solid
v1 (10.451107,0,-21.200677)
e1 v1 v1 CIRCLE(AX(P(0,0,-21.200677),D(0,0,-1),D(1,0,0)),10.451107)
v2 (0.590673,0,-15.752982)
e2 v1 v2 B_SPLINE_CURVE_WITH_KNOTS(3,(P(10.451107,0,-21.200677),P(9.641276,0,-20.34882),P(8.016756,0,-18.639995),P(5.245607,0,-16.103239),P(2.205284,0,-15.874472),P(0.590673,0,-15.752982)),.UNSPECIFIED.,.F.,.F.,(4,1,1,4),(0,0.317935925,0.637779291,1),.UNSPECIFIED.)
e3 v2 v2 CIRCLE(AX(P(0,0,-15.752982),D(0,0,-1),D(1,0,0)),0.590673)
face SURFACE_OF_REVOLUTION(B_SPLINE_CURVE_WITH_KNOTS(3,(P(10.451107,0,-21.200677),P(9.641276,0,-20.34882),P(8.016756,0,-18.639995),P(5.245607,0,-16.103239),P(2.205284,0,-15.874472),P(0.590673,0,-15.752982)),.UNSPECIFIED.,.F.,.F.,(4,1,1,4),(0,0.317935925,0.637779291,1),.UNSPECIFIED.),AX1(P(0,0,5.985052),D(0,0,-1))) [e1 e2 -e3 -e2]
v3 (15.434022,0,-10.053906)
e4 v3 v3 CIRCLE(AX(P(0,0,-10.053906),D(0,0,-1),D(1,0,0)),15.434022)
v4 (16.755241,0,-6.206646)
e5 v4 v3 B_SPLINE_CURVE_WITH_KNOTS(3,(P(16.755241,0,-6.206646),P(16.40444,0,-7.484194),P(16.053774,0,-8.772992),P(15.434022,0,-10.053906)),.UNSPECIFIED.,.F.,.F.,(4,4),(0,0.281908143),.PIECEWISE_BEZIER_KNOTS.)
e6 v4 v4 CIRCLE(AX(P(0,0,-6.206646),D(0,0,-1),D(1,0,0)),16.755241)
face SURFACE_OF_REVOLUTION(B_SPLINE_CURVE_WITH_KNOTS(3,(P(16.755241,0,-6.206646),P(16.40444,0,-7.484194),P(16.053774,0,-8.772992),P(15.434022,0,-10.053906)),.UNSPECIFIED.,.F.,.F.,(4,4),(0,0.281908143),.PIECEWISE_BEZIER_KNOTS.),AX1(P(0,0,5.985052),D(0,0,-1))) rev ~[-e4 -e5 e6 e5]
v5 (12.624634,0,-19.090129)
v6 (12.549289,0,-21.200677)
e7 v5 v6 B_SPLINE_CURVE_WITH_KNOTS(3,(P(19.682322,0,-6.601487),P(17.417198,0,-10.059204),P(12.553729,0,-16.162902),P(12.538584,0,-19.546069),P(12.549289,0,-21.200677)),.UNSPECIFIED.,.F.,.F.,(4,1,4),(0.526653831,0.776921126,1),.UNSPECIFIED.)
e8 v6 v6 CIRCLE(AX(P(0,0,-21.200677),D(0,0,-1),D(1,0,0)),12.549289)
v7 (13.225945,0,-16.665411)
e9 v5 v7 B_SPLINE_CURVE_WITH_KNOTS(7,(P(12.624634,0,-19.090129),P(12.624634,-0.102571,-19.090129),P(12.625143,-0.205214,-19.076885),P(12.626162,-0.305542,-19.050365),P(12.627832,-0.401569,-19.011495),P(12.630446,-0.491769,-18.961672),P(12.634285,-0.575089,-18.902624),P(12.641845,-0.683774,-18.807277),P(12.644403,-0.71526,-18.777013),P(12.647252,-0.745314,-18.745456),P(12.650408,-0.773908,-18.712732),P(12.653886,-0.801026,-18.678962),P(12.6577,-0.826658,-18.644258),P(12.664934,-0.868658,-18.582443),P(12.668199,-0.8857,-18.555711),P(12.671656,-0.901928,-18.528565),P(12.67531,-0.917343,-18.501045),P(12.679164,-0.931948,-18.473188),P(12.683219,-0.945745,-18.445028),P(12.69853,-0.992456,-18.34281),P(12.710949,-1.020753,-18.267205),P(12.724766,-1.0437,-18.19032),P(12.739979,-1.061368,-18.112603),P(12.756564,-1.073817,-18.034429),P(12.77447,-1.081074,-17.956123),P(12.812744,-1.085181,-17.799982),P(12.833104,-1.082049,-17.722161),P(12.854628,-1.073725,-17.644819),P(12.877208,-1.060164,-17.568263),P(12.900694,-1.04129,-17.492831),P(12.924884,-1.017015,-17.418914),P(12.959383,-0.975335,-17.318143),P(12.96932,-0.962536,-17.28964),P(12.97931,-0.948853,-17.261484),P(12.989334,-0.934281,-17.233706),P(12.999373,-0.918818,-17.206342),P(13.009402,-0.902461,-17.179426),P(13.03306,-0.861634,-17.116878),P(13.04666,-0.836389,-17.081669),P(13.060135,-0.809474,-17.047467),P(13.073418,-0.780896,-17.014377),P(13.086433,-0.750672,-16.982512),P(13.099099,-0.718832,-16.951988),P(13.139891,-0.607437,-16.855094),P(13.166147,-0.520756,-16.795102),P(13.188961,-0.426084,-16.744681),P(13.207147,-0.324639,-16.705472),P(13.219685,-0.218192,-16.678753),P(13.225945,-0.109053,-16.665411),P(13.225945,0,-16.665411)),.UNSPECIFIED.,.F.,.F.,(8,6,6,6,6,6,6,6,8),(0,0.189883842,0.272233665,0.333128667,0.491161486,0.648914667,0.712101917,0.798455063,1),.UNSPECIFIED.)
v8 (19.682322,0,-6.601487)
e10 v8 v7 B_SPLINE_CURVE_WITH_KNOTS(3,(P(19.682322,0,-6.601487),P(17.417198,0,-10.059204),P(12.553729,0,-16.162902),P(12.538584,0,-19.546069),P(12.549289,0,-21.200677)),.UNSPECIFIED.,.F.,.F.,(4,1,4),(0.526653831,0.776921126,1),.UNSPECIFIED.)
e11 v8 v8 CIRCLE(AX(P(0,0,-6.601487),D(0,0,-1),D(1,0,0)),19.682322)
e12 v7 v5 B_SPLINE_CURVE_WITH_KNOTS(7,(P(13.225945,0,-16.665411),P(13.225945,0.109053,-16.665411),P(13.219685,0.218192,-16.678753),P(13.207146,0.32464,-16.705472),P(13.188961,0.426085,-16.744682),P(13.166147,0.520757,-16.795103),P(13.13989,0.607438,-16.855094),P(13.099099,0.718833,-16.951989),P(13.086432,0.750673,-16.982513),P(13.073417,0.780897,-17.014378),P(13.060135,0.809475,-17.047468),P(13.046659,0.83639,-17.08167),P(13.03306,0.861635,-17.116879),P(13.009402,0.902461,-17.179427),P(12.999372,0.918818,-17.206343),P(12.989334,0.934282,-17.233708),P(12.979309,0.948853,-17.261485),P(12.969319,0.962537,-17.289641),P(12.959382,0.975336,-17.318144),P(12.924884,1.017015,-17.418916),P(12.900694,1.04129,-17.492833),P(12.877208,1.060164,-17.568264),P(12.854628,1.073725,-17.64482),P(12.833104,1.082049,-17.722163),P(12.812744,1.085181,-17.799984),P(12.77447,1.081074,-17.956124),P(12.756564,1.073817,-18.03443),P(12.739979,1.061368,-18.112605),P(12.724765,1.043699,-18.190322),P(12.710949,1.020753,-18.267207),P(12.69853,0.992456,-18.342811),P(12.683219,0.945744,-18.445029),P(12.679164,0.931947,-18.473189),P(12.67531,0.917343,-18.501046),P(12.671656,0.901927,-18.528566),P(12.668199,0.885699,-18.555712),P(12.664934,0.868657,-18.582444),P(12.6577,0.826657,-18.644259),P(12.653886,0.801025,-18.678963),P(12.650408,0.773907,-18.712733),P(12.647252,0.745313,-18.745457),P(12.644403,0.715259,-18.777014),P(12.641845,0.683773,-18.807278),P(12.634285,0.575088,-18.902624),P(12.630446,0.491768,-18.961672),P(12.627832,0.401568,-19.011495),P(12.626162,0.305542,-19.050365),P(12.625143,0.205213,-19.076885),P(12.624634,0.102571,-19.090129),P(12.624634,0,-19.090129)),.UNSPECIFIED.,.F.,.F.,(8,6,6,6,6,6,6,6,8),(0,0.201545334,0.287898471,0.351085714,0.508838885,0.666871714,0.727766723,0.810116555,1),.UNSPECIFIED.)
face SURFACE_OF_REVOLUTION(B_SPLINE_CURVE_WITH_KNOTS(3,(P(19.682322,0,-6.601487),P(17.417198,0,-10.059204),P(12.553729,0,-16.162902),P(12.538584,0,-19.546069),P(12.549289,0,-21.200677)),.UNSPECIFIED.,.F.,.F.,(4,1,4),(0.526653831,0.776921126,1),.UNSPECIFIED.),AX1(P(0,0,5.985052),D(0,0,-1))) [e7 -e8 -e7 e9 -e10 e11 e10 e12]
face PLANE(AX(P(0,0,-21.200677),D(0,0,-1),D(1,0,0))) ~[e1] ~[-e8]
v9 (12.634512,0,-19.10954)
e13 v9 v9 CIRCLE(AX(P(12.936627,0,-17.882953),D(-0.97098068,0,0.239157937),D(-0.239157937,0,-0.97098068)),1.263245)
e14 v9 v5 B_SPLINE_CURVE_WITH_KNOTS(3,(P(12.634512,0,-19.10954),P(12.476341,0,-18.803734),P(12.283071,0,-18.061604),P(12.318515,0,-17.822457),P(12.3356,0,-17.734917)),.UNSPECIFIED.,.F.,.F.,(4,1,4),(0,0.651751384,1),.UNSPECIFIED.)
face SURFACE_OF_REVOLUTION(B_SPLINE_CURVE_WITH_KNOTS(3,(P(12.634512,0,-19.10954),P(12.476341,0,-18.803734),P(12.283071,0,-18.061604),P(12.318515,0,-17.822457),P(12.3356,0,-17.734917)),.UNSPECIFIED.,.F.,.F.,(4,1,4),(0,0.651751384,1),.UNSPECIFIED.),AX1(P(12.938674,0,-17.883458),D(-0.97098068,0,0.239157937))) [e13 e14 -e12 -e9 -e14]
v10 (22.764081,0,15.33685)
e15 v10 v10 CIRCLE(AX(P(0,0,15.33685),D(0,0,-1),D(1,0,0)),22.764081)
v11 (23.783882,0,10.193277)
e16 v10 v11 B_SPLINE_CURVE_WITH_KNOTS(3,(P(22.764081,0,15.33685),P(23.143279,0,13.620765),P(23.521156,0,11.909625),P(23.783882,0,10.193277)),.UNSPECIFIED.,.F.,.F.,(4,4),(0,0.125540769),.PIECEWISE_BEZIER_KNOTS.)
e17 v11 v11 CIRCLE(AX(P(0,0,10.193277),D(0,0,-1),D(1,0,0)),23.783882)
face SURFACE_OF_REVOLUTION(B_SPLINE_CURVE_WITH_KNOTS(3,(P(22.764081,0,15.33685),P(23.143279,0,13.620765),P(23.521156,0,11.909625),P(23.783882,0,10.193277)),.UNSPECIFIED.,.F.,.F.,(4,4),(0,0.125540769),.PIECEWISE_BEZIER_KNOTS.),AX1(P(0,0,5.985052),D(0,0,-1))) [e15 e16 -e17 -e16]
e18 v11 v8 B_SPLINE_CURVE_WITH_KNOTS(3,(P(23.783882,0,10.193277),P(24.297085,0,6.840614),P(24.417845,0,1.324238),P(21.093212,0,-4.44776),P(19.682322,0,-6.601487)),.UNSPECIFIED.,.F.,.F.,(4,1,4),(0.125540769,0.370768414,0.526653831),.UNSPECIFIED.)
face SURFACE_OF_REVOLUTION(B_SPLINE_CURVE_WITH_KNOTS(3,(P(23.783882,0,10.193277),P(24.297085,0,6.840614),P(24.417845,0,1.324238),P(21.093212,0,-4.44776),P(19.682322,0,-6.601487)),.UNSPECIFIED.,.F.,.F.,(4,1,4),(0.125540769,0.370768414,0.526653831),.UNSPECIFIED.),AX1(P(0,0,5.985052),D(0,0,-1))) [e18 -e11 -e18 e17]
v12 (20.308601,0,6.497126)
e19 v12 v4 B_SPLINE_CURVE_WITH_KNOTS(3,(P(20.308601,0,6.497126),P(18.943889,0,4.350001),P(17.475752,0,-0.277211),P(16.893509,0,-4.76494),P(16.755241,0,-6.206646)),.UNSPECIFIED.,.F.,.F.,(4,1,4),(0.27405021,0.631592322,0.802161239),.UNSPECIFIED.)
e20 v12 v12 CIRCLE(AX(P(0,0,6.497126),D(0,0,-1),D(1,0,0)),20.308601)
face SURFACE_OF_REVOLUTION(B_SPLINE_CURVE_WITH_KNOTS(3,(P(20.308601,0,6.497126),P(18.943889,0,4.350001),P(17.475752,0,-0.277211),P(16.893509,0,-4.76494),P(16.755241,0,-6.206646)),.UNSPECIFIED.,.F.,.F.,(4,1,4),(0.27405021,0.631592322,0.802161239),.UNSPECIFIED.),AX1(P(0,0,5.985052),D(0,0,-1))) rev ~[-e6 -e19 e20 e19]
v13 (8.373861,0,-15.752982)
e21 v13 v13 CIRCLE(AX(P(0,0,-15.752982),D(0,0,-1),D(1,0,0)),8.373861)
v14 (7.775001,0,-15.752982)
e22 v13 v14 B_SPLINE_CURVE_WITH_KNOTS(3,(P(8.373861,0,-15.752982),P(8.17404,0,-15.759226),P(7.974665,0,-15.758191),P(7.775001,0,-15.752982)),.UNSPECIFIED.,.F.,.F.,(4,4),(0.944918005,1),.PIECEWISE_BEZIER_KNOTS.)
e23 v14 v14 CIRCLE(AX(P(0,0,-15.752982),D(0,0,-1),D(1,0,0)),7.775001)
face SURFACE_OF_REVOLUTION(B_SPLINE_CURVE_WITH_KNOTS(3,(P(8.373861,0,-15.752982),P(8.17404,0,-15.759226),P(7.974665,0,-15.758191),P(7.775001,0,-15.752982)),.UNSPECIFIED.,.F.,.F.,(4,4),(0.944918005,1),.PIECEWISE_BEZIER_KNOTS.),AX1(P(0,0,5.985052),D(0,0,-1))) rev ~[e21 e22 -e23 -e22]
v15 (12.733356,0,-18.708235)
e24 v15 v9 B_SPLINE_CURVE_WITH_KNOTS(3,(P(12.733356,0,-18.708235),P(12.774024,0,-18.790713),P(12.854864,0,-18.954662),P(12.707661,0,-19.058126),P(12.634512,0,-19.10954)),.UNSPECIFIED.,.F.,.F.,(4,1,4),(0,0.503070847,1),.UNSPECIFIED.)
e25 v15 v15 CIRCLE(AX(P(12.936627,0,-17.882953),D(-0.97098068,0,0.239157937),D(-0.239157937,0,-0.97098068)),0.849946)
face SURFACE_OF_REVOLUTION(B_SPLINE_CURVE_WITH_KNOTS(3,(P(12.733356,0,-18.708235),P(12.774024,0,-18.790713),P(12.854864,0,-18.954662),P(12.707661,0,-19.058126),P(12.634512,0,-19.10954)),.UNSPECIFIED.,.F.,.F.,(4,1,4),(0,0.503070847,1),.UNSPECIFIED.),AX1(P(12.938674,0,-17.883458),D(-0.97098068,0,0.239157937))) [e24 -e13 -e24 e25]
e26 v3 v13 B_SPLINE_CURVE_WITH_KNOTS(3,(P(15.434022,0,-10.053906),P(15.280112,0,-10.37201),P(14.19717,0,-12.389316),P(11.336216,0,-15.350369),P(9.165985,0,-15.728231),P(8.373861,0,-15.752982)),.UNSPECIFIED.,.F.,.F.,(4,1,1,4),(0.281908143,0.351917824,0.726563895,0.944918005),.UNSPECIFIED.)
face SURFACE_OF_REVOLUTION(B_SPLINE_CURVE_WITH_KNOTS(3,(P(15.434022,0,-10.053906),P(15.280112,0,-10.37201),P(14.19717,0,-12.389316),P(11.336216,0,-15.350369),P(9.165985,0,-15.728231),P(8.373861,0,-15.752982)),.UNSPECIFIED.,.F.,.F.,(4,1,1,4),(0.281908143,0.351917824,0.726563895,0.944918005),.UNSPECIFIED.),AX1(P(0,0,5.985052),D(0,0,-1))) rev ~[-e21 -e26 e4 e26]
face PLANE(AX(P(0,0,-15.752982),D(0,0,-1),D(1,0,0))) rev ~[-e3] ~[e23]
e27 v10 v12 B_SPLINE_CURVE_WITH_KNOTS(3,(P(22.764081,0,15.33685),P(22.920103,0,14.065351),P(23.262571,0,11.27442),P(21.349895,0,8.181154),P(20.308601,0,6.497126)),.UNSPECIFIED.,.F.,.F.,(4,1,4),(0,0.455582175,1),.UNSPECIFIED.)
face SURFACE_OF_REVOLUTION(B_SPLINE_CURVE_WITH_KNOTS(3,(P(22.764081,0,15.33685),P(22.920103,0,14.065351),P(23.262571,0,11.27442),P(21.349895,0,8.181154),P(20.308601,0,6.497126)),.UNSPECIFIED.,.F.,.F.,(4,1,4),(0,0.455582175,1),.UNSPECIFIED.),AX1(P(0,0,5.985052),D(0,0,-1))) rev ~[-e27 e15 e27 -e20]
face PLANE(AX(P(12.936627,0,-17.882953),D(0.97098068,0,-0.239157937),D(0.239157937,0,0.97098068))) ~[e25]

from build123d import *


with BuildPart() as f1:
    # F0 (on Front) → F1 (revolve)
    with BuildSketch(Plane.XZ):
        with BuildLine():
            add(Edge.make_bspline(
                [(19.6823217034, -6.6014872209), (18.7206290933, -7.4863491309), (17.5676079465, -8.5412161557), (16.6606779031, -9.2215613008), (16.5172192351, -9.3254513944)],
                knots=[0, 0, 0, 0, 0.5821747808, 0.6959078834, 0.6959078834, 0.6959078834, 0.6959078834], degree=3))
            add(Edge.make_bspline(
                [(23.7838823749, 10.1932772593), (24.2970848929, 6.840613956), (24.4178453084, 1.3242383799), (21.093212182, -4.4477596725), (19.6823217034, -6.6014872209)],
                knots=[0.1255407693, 0.1255407693, 0.1255407693, 0.1255407693, 0.3707684145, 0.5266538311, 0.5266538311, 0.5266538311, 0.5266538311], degree=3))
            add(Edge.make_bspline(
                [(23.7838823557, 10.1932772629), (22.5530164904, 9.153802728), (21.3274805944, 8.1001474), (20.3086007386, 6.497125607)],
                knots=[0.0071128484, 0.0071128484, 0.0071128484, 0.0071128484, 0.27405021, 0.27405021, 0.27405021, 0.27405021], degree=3))
            add(Edge.make_bspline(
                [(20.3086007386, 6.497125607), (18.9438893572, 4.3500009258), (17.4757524028, -0.2772106808), (16.8935087075, -4.7649402342), (16.755240937, -6.2066463042)],
                knots=[0.27405021, 0.27405021, 0.27405021, 0.27405021, 0.6315923221, 0.8021612393, 0.8021612393, 0.8021612393, 0.8021612393], degree=3))
            add(Edge.make_bspline(
                [(16.755240937, -6.2066463042), (16.6552314343, -7.2494367288), (16.5812677523, -8.2881791115), (16.5172192351, -9.3254513944)],
                knots=[0.8021612393, 0.8021612393, 0.8021612393, 0.8021612393, 0.9255342605, 0.9255342605, 0.9255342605, 0.9255342605], degree=3))
        make_face()
        with BuildLine():
            add(Edge.make_bspline(
                [(19.6823217034, -6.6014872209), (17.4171980587, -10.0592036547), (12.5537292031, -16.1629021911), (12.5385838339, -19.5460692495), (12.5492885709, -21.20067738)],
                knots=[0.5266538311, 0.5266538311, 0.5266538311, 0.5266538311, 0.7769211256, 1, 1, 1, 1], degree=3))
            add(Edge.make_bspline(
                [(19.6823217034, -6.6014872209), (18.7206290933, -7.4863491309), (17.5676079465, -8.5412161557), (16.6606779031, -9.2215613008), (16.5172192351, -9.3254513944)],
                knots=[0, 0, 0, 0, 0.5821747808, 0.6959078834, 0.6959078834, 0.6959078834, 0.6959078834], degree=3))
            add(Edge.make_bspline(
                [(16.5172192351, -9.3254513944), (16.1336488497, -9.6032259185), (15.7841216901, -9.8288168601), (15.4340223068, -10.0539055119)],
                knots=[0.6959078834, 0.6959078834, 0.6959078834, 0.6959078834, 1, 1, 1, 1], degree=3))
            add(Edge.make_bspline(
                [(15.4340223068, -10.0539055119), (15.2801119472, -10.3720102908), (14.1971702129, -12.3893155375), (11.3362161193, -15.3503692976), (9.1659848619, -15.7282313026), (8.3738614299, -15.7529823482)],
                knots=[0.281908143, 0.281908143, 0.281908143, 0.281908143, 0.3519178239, 0.7265638945, 0.9449180046, 0.9449180046, 0.9449180046, 0.9449180046], degree=3))
            add(Edge.make_bspline(
                [(8.3738614299, -15.7529823482), (8.1740404178, -15.7592260456), (7.9746646983, -15.7581908421), (7.7750007622, -15.7529823482)],
                knots=[0.9449180046, 0.9449180046, 0.9449180046, 0.9449180046, 1, 1, 1, 1], degree=3))
            Line((7.7750007622, -15.7529823482), (0.5906730657, -15.7529823482))
            add(Edge.make_bspline(
                [(10.4511072859, -21.20067738), (9.6412763004, -20.3488201147), (8.0167557876, -18.6399949078), (5.2456073558, -16.1032388951), (2.2052839685, -15.8744723638), (0.5906730657, -15.7529823482)],
                knots=[0, 0, 0, 0, 0.3179359251, 0.6377792914, 1, 1, 1, 1], degree=3))
            Line((10.4511072859, -21.20067738), (12.5492885709, -21.20067738))
        make_face()
        with BuildLine():
            add(Edge.make_bspline(
                [(23.7838823557, 10.1932772629), (22.5530164904, 9.153802728), (21.3274805944, 8.1001474), (20.3086007386, 6.497125607)],
                knots=[0.0071128484, 0.0071128484, 0.0071128484, 0.0071128484, 0.27405021, 0.27405021, 0.27405021, 0.27405021], degree=3))
            add(Edge.make_bspline(
                [(22.7640811354, 15.3368497267), (23.1432789035, 13.6207649594), (23.5211557201, 11.9096250621), (23.7838823749, 10.1932772593)],
                knots=[0, 0, 0, 0, 0.1255407693, 0.1255407693, 0.1255407693, 0.1255407693], degree=3))
            add(Edge.make_bspline(
                [(22.7640811354, 15.3368497267), (22.9201033117, 14.065351127), (23.2625710046, 11.2744197209), (21.3498954205, 8.1811543908), (20.3086007386, 6.497125607)],
                knots=[0, 0, 0, 0, 0.4555821748, 1, 1, 1, 1], degree=3))
        make_face()
        with BuildLine():
            add(Edge.make_bspline(
                [(16.5172192351, -9.3254513944), (16.1336488497, -9.6032259185), (15.7841216901, -9.8288168601), (15.4340223068, -10.0539055119)],
                knots=[0.6959078834, 0.6959078834, 0.6959078834, 0.6959078834, 1, 1, 1, 1], degree=3))
            add(Edge.make_bspline(
                [(16.755240937, -6.2066463042), (16.6552314343, -7.2494367288), (16.5812677523, -8.2881791115), (16.5172192351, -9.3254513944)],
                knots=[0.8021612393, 0.8021612393, 0.8021612393, 0.8021612393, 0.9255342605, 0.9255342605, 0.9255342605, 0.9255342605], degree=3))
            add(Edge.make_bspline(
                [(16.755240937, -6.2066463042), (16.4044399801, -7.4841944835), (16.053773505, -8.7729922694), (15.4340223068, -10.0539055119)],
                knots=[0, 0, 0, 0, 0.281908143, 0.281908143, 0.281908143, 0.281908143], degree=3))
        make_face()
    revolve(axis=Axis((0, 0, 5.9850515099), (0, 0, -1)))

    # F2 (on Front) → F3 (revolve)
    with BuildSketch(Plane.XZ):
        with BuildLine():
            add(Edge.make_bspline(
                [(12.7333556769, -18.7082347352), (12.7740238366, -18.7907127998), (12.8548636625, -18.9546620031), (12.7076612214, -19.0581256067), (12.634512037, -19.1095396876)],
                knots=[0, 0, 0, 0, 0.5030708471, 1, 1, 1, 1], degree=3))
            Line((12.7333556769, -18.7082347352), (12.634512037, -19.1095396876))
        make_face()
        with BuildLine():
            add(Edge.make_bspline(
                [(12.4912384255, -17.7732517499), (12.4659192386, -17.9335036999), (12.4138150114, -18.2632853804), (12.6248629774, -18.5571623933), (12.7333556769, -18.7082347352)],
                knots=[0, 0, 0, 0, 0.4859334508, 1, 1, 1, 1], degree=3))
            Line((12.7333556769, -18.7082347352), (12.9366270456, -17.8829534421))
            Line((12.9366270456, -17.8829534421), (12.4912384255, -17.7732517499))
        make_face()
        with BuildLine():
            Line((12.634512037, -19.1095396876), (12.7333556769, -18.7082347352))
            add(Edge.make_bspline(
                [(12.4912384255, -17.7732517499), (12.4659192386, -17.9335036999), (12.4138150114, -18.2632853804), (12.6248629774, -18.5571623933), (12.7333556769, -18.7082347352)],
                knots=[0, 0, 0, 0, 0.4859334508, 1, 1, 1, 1], degree=3))
            Line((12.4912384255, -17.7732517499), (12.3356003172, -17.7349172189))
            add(Edge.make_bspline(
                [(12.634512037, -19.1095396876), (12.4763407595, -18.8037343288), (12.2830712375, -18.0616036857), (12.3185150717, -17.8224569612), (12.3356003172, -17.7349172189)],
                knots=[0, 0, 0, 0, 0.6517513838, 1, 1, 1, 1], degree=3))
        make_face()
    revolve(axis=Axis((12.9386744507, 0, -17.8834577293), (-0.97098068, 0, 0.2391579373)))


solid = f1.part
